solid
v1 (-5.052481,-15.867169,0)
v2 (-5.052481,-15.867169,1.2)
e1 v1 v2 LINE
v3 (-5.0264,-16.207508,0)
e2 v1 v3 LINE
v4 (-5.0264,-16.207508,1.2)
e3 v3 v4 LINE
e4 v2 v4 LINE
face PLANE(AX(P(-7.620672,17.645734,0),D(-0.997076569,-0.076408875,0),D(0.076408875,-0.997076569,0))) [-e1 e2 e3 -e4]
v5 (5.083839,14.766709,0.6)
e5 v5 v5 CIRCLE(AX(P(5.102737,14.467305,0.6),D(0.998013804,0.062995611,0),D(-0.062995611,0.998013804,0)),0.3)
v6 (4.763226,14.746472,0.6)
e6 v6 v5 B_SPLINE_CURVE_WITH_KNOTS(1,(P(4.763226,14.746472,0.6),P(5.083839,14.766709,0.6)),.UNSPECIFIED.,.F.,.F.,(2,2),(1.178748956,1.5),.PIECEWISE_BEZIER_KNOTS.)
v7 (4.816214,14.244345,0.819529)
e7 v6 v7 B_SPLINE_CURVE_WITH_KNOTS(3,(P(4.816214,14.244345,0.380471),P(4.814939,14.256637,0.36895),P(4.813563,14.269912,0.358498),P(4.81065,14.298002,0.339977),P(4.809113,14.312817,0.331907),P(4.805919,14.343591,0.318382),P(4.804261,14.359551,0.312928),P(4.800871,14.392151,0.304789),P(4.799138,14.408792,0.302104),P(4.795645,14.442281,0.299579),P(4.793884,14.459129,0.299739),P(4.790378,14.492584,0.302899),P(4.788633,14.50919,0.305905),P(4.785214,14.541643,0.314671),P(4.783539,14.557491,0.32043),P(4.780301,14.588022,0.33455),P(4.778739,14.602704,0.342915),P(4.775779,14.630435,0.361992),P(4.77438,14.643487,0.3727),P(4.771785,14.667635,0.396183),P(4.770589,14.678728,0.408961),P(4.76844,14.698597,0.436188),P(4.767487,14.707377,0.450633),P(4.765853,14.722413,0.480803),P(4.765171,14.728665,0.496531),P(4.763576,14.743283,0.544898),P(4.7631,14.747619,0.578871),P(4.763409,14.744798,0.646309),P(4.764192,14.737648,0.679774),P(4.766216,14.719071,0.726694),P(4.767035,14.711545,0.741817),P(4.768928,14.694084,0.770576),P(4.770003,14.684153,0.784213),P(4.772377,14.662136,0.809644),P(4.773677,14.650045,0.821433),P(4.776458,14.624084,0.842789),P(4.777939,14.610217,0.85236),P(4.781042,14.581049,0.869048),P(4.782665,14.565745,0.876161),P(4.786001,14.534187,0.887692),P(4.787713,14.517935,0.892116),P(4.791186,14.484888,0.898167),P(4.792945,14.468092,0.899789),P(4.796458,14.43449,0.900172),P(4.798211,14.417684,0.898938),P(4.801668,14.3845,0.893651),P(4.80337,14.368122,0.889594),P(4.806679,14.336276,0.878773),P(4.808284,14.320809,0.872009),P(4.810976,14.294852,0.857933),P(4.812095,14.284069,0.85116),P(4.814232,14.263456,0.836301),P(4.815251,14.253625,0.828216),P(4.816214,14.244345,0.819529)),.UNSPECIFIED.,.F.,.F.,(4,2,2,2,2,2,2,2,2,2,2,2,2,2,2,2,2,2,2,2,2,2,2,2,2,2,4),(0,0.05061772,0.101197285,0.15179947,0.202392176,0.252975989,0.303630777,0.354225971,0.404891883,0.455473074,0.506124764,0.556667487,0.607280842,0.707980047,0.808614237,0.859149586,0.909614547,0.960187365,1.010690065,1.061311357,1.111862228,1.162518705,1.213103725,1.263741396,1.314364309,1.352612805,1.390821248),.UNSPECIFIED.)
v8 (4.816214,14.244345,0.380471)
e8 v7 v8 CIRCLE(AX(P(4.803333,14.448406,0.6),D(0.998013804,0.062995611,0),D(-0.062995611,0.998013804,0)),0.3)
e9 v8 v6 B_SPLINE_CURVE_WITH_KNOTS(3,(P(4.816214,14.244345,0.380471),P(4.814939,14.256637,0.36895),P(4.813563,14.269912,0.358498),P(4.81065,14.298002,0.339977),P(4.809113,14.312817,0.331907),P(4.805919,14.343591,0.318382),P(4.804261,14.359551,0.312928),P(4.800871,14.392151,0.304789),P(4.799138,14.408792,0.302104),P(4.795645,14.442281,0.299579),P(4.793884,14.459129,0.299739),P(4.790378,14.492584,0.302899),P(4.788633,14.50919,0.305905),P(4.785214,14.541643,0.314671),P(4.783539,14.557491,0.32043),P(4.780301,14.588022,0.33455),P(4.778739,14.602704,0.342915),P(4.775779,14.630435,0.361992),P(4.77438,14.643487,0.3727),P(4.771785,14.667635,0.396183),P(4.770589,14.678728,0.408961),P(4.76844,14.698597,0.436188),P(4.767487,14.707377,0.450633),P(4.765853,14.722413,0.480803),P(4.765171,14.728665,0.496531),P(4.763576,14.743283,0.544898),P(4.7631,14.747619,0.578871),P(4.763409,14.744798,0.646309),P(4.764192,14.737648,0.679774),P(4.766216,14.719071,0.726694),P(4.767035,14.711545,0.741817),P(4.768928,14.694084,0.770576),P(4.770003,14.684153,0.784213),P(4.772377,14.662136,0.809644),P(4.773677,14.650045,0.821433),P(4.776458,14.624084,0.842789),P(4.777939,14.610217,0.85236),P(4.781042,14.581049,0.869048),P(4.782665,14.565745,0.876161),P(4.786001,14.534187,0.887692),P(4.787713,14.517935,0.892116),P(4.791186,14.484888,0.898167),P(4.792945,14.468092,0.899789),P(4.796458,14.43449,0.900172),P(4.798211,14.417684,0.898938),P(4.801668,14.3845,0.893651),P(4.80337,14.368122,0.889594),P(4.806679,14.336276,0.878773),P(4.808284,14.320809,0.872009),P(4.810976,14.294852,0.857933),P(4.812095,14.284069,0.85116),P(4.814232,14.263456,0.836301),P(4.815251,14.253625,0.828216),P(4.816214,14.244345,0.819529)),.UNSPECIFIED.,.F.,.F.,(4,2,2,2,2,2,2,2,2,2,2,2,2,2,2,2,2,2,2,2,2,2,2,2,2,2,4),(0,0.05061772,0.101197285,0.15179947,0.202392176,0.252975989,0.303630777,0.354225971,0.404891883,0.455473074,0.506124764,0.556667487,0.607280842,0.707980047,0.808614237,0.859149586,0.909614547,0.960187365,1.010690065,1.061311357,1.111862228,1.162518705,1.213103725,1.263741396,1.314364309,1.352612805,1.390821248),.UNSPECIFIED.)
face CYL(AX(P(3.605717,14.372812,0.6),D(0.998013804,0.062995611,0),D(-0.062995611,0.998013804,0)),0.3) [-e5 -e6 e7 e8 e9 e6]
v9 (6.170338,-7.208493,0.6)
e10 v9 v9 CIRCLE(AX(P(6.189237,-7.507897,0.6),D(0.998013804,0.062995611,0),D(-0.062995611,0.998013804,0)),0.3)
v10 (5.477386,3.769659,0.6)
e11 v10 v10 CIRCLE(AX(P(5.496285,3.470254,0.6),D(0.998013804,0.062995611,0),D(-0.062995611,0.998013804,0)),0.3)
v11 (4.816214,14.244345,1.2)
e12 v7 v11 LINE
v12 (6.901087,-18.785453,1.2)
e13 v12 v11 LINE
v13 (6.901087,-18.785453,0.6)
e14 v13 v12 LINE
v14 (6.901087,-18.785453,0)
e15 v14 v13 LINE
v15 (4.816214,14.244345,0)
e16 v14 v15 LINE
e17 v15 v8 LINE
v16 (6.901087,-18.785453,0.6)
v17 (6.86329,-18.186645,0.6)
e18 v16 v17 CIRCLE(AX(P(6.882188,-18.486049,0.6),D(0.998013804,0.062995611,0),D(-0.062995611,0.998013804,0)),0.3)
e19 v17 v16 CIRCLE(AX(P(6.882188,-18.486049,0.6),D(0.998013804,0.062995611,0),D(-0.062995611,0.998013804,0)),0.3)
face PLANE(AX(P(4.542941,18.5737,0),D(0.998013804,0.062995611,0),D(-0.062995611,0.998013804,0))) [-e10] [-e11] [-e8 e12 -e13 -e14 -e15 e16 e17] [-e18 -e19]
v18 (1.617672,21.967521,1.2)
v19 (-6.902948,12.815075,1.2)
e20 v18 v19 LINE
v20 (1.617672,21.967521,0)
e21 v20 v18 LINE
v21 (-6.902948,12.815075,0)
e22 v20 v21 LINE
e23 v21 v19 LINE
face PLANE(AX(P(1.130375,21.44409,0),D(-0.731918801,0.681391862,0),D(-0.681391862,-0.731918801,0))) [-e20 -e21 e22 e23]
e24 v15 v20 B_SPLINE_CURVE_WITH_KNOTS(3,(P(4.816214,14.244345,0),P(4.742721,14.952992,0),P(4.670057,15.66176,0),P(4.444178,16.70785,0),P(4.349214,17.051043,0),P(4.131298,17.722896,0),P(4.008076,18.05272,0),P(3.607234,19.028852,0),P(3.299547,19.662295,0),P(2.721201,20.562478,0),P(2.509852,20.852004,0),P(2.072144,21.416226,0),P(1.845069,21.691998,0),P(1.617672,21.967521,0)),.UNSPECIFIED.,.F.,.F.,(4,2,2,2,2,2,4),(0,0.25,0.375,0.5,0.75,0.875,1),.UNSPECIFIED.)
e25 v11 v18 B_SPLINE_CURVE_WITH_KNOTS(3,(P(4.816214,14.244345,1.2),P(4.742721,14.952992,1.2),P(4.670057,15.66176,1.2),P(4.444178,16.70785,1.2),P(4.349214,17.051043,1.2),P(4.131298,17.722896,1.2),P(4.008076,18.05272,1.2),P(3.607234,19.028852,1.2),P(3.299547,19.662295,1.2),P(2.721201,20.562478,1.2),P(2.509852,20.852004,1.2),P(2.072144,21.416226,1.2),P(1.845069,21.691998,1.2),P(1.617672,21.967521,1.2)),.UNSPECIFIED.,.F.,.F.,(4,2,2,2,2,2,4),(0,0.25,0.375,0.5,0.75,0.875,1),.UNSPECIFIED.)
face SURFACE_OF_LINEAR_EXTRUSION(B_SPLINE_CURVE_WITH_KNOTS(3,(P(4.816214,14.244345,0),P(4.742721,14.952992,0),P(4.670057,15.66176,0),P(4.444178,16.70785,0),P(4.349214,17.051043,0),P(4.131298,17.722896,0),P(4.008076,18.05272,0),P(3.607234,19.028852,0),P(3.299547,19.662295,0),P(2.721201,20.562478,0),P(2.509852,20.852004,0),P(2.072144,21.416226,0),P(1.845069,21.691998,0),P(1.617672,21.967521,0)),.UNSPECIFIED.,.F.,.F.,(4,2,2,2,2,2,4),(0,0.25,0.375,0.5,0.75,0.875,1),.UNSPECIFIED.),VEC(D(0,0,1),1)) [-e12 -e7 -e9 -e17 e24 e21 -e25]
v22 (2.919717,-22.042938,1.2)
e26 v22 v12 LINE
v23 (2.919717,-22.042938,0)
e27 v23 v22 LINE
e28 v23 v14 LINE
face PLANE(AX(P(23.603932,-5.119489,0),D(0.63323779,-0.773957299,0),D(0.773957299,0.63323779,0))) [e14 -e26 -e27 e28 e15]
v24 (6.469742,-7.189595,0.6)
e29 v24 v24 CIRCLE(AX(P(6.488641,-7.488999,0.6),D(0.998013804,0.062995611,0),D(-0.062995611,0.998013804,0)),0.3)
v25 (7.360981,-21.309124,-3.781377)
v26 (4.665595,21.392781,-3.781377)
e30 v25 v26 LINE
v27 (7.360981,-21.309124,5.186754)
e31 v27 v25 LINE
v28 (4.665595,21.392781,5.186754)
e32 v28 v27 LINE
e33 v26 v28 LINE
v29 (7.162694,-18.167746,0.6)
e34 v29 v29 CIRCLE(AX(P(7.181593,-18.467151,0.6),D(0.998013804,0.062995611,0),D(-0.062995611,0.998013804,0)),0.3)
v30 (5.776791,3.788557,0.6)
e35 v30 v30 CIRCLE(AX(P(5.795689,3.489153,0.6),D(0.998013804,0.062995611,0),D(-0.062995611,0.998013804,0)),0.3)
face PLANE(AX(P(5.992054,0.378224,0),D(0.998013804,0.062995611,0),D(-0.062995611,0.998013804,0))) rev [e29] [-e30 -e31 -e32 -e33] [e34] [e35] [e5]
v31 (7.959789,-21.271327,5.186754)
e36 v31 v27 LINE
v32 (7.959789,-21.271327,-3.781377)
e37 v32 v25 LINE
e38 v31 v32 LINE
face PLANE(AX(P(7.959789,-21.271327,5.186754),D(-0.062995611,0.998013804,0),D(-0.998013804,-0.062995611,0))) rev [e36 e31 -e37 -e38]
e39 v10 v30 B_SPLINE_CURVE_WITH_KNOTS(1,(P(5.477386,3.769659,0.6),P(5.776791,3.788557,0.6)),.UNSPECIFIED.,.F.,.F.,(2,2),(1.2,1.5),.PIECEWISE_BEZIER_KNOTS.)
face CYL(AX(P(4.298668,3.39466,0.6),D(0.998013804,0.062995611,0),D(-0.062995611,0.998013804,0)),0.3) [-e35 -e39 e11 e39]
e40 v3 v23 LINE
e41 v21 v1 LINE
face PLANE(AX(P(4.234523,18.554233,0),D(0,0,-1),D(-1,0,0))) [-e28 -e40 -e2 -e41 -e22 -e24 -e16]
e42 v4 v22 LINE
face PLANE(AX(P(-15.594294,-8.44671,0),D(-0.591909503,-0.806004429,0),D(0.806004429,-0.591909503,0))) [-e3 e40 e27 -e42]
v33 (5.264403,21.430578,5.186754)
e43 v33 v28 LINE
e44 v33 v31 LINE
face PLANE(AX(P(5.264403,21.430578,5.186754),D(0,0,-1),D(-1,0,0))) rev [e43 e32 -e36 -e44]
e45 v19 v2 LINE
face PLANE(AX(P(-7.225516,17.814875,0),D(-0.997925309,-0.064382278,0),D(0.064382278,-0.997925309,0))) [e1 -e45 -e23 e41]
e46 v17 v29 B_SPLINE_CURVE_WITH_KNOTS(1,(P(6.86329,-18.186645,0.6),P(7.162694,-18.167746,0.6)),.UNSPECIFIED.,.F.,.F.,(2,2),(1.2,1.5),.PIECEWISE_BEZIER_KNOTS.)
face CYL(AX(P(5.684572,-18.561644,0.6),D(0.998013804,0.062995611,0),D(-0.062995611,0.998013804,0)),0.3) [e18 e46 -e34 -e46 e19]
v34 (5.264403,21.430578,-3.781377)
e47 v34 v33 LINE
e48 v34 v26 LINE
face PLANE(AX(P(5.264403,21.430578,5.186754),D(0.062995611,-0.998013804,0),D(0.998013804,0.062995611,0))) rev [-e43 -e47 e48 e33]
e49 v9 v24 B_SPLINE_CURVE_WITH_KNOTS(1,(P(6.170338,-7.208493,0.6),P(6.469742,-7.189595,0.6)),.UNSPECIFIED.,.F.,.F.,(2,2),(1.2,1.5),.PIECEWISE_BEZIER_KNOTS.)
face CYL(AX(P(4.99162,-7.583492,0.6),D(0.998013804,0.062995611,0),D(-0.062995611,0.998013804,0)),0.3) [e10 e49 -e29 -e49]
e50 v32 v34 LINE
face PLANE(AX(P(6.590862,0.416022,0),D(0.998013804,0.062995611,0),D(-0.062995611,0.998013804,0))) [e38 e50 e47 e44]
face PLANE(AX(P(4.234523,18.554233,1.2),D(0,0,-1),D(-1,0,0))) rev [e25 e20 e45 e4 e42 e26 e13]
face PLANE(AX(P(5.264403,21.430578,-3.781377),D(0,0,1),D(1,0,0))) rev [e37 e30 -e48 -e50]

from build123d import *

# Parameters (mm, degrees)
EXTRUDE_1_DEPTH      = 1.2
CUT_EXTRUDE_START    = -1.2
CUT_EXTRUDE_1_DEPTH  = 1.2
EXTRUDE_2_DEPTH      = 0.3
EXTRUDE_2_DEPTH_BACK = 1.2
SKETCH_3_R           = 0.3
SKETCH_4_W           = 8.968131771
SKETCH_4_H           = 42.786888223
EXTRUDE_3_DEPTH      = 0.6


# Read off the part's stored shape, not the designer's step: Вырез-Вытянуть-Тонкостенный1
with BuildPart() as part:
    # Эскиз1 → Бобышка-Вытянуть1 (new body)
    with BuildSketch(Plane.XY):
        with BuildLine():
            Line((-5.411197125, -16.421197495), (2.932953168, -22.548932866))
            Line((2.932953168, -22.548932866), (7.313221262, -18.965077153))
            Line((7.313221262, -18.965077153), (5.214911567, 14.277588478))
            add(Edge.make_bspline(
                [(5.214911567, 14.277588478), (5.138438722, 15.014978004), (4.987374421, 16.471615759), (4.285048461, 18.555840063), (3.313335464, 20.541616369), (2.370787647, 21.6834935), (1.892587883, 22.262822595)],
                knots=[0, 0, 0, 0, 0.251767614, 0.497341227, 0.74497707, 1, 1, 1, 1], degree=3))
            Line((1.892587883, 22.262822595), (1.612438242, 22.548932866))
            Line((1.612438242, 22.548932866), (-7.313221262, 12.961413017))
            Line((-7.313221262, 12.961413017), (-5.451496049, -15.895327784))
            Line((-5.451496049, -15.895327784), (-5.411197125, -16.421197495))
        make_face()
    extrude(amount=EXTRUDE_1_DEPTH)

    # Вырез-Вытянуть-Тонкостенный1 outline → Вырез-Вытянуть-Тонкостенный1 (cut)
    with BuildSketch(Plane.XY.offset(1.2).offset(CUT_EXTRUDE_START)):
        with BuildLine():
            Line((7.313221262, -18.965077153), (5.214911567, 14.277588478))
            add(Edge.make_bspline(
                [(5.214911567, 14.277588478), (5.138438722, 15.014978004), (4.987374421, 16.471615759), (4.285048461, 18.555840063), (3.313335464, 20.541616369), (2.370787647, 21.6834935), (1.892587883, 22.262822595)],
                knots=[0, 0, 0, 0, 0.251767614, 0.497341227, 0.74497707, 1, 1, 1, 1], degree=3))
            Line((1.892587883, 22.262822595), (1.612438242, 22.548932866))
            Line((1.612438242, 22.548932866), (-7.313221262, 12.961413017))
            Line((-7.313221262, 12.961413017), (-5.451496049, -15.895327784))
            Line((-5.451496049, -15.895327784), (-5.411197125, -16.421197495))
            Line((-5.411197125, -16.421197495), (2.932953168, -22.548932866))
            Line((2.932953168, -22.548932866), (7.313221262, -18.965077153))
        make_face()
        with BuildLine():
            add(Edge.make_bspline(
                [(4.816213875, 14.244344904), (4.742720796, 14.952991901), (4.670057139, 15.661759974), (4.444177706, 16.707849761), (4.349214266, 17.051042697), (4.131298148, 17.722896385), (4.008075561, 18.052719847), (3.607234384, 19.028852016), (3.299546795, 19.66229506), (2.721200979, 20.562478072), (2.509851785, 20.852004475), (2.072144291, 21.416226224), (1.845069272, 21.691997878), (1.617672174, 21.967521187)],
                knots=[0, 0, 0, 0, 0.25, 0.25, 0.375, 0.375, 0.5, 0.5, 0.75, 0.75, 0.875, 0.875, 1, 1, 1, 1], degree=3))
            Line((4.816213875, 14.244344904), (6.901087174, -18.785453392))
            Line((6.901087174, -18.785453392), (2.919717459, -22.042937704))
            Line((2.919717459, -22.042937704), (-5.026399994, -16.2075077))
            Line((-5.026399994, -16.2075077), (-5.052481173, -15.867168531))
            Line((-5.052481173, -15.867168531), (-6.902948488, 12.81507484))
            Line((-6.902948488, 12.81507484), (1.617672174, 21.967521187))
        make_face(mode=Mode.SUBTRACT)
    extrude(amount=CUT_EXTRUDE_1_DEPTH, mode=Mode.SUBTRACT)

    # Эскиз3 → Бобышка-Вытянуть2 (add, two sides: drawn at the far end of the back side and taken through both)
    with BuildSketch(Plane(origin=(5.692649923, 0.359325653, 0), x_dir=(0, 0, -1), z_dir=(0.9980138039949711, 0.06299561123989302, 0)).offset(-EXTRUDE_2_DEPTH_BACK)):
        with Locations(Location((-0.6, -18.882880004, 0), (0, 0, 90))):
            Circle(SKETCH_3_R)
        with Locations(Location((-0.6, -7.882880004, 0), (0, 0, 90))):
            Circle(SKETCH_3_R)
        with Locations(Location((-0.6, 3.117119996, 0), (0, 0, 90))):
            Circle(SKETCH_3_R)
        with Locations(Location((-0.6, 14.117119996, 0), (0, 0, 90))):
            Circle(SKETCH_3_R)
    extrude(amount=EXTRUDE_2_DEPTH + EXTRUDE_2_DEPTH_BACK)

    # Эскиз4 → Бобышка-Вытянуть3 (add)
    with BuildSketch(Plane(origin=(5.992054064, 0.378224336, 0), x_dir=(0, 0, -1), z_dir=(0.9980138039949711, 0.06299561123989304, 0))):
        with Locations((-0.702688531, -0.337065509)):
            Rectangle(SKETCH_4_W, SKETCH_4_H)
    extrude(amount=EXTRUDE_3_DEPTH)


solid = part.part
